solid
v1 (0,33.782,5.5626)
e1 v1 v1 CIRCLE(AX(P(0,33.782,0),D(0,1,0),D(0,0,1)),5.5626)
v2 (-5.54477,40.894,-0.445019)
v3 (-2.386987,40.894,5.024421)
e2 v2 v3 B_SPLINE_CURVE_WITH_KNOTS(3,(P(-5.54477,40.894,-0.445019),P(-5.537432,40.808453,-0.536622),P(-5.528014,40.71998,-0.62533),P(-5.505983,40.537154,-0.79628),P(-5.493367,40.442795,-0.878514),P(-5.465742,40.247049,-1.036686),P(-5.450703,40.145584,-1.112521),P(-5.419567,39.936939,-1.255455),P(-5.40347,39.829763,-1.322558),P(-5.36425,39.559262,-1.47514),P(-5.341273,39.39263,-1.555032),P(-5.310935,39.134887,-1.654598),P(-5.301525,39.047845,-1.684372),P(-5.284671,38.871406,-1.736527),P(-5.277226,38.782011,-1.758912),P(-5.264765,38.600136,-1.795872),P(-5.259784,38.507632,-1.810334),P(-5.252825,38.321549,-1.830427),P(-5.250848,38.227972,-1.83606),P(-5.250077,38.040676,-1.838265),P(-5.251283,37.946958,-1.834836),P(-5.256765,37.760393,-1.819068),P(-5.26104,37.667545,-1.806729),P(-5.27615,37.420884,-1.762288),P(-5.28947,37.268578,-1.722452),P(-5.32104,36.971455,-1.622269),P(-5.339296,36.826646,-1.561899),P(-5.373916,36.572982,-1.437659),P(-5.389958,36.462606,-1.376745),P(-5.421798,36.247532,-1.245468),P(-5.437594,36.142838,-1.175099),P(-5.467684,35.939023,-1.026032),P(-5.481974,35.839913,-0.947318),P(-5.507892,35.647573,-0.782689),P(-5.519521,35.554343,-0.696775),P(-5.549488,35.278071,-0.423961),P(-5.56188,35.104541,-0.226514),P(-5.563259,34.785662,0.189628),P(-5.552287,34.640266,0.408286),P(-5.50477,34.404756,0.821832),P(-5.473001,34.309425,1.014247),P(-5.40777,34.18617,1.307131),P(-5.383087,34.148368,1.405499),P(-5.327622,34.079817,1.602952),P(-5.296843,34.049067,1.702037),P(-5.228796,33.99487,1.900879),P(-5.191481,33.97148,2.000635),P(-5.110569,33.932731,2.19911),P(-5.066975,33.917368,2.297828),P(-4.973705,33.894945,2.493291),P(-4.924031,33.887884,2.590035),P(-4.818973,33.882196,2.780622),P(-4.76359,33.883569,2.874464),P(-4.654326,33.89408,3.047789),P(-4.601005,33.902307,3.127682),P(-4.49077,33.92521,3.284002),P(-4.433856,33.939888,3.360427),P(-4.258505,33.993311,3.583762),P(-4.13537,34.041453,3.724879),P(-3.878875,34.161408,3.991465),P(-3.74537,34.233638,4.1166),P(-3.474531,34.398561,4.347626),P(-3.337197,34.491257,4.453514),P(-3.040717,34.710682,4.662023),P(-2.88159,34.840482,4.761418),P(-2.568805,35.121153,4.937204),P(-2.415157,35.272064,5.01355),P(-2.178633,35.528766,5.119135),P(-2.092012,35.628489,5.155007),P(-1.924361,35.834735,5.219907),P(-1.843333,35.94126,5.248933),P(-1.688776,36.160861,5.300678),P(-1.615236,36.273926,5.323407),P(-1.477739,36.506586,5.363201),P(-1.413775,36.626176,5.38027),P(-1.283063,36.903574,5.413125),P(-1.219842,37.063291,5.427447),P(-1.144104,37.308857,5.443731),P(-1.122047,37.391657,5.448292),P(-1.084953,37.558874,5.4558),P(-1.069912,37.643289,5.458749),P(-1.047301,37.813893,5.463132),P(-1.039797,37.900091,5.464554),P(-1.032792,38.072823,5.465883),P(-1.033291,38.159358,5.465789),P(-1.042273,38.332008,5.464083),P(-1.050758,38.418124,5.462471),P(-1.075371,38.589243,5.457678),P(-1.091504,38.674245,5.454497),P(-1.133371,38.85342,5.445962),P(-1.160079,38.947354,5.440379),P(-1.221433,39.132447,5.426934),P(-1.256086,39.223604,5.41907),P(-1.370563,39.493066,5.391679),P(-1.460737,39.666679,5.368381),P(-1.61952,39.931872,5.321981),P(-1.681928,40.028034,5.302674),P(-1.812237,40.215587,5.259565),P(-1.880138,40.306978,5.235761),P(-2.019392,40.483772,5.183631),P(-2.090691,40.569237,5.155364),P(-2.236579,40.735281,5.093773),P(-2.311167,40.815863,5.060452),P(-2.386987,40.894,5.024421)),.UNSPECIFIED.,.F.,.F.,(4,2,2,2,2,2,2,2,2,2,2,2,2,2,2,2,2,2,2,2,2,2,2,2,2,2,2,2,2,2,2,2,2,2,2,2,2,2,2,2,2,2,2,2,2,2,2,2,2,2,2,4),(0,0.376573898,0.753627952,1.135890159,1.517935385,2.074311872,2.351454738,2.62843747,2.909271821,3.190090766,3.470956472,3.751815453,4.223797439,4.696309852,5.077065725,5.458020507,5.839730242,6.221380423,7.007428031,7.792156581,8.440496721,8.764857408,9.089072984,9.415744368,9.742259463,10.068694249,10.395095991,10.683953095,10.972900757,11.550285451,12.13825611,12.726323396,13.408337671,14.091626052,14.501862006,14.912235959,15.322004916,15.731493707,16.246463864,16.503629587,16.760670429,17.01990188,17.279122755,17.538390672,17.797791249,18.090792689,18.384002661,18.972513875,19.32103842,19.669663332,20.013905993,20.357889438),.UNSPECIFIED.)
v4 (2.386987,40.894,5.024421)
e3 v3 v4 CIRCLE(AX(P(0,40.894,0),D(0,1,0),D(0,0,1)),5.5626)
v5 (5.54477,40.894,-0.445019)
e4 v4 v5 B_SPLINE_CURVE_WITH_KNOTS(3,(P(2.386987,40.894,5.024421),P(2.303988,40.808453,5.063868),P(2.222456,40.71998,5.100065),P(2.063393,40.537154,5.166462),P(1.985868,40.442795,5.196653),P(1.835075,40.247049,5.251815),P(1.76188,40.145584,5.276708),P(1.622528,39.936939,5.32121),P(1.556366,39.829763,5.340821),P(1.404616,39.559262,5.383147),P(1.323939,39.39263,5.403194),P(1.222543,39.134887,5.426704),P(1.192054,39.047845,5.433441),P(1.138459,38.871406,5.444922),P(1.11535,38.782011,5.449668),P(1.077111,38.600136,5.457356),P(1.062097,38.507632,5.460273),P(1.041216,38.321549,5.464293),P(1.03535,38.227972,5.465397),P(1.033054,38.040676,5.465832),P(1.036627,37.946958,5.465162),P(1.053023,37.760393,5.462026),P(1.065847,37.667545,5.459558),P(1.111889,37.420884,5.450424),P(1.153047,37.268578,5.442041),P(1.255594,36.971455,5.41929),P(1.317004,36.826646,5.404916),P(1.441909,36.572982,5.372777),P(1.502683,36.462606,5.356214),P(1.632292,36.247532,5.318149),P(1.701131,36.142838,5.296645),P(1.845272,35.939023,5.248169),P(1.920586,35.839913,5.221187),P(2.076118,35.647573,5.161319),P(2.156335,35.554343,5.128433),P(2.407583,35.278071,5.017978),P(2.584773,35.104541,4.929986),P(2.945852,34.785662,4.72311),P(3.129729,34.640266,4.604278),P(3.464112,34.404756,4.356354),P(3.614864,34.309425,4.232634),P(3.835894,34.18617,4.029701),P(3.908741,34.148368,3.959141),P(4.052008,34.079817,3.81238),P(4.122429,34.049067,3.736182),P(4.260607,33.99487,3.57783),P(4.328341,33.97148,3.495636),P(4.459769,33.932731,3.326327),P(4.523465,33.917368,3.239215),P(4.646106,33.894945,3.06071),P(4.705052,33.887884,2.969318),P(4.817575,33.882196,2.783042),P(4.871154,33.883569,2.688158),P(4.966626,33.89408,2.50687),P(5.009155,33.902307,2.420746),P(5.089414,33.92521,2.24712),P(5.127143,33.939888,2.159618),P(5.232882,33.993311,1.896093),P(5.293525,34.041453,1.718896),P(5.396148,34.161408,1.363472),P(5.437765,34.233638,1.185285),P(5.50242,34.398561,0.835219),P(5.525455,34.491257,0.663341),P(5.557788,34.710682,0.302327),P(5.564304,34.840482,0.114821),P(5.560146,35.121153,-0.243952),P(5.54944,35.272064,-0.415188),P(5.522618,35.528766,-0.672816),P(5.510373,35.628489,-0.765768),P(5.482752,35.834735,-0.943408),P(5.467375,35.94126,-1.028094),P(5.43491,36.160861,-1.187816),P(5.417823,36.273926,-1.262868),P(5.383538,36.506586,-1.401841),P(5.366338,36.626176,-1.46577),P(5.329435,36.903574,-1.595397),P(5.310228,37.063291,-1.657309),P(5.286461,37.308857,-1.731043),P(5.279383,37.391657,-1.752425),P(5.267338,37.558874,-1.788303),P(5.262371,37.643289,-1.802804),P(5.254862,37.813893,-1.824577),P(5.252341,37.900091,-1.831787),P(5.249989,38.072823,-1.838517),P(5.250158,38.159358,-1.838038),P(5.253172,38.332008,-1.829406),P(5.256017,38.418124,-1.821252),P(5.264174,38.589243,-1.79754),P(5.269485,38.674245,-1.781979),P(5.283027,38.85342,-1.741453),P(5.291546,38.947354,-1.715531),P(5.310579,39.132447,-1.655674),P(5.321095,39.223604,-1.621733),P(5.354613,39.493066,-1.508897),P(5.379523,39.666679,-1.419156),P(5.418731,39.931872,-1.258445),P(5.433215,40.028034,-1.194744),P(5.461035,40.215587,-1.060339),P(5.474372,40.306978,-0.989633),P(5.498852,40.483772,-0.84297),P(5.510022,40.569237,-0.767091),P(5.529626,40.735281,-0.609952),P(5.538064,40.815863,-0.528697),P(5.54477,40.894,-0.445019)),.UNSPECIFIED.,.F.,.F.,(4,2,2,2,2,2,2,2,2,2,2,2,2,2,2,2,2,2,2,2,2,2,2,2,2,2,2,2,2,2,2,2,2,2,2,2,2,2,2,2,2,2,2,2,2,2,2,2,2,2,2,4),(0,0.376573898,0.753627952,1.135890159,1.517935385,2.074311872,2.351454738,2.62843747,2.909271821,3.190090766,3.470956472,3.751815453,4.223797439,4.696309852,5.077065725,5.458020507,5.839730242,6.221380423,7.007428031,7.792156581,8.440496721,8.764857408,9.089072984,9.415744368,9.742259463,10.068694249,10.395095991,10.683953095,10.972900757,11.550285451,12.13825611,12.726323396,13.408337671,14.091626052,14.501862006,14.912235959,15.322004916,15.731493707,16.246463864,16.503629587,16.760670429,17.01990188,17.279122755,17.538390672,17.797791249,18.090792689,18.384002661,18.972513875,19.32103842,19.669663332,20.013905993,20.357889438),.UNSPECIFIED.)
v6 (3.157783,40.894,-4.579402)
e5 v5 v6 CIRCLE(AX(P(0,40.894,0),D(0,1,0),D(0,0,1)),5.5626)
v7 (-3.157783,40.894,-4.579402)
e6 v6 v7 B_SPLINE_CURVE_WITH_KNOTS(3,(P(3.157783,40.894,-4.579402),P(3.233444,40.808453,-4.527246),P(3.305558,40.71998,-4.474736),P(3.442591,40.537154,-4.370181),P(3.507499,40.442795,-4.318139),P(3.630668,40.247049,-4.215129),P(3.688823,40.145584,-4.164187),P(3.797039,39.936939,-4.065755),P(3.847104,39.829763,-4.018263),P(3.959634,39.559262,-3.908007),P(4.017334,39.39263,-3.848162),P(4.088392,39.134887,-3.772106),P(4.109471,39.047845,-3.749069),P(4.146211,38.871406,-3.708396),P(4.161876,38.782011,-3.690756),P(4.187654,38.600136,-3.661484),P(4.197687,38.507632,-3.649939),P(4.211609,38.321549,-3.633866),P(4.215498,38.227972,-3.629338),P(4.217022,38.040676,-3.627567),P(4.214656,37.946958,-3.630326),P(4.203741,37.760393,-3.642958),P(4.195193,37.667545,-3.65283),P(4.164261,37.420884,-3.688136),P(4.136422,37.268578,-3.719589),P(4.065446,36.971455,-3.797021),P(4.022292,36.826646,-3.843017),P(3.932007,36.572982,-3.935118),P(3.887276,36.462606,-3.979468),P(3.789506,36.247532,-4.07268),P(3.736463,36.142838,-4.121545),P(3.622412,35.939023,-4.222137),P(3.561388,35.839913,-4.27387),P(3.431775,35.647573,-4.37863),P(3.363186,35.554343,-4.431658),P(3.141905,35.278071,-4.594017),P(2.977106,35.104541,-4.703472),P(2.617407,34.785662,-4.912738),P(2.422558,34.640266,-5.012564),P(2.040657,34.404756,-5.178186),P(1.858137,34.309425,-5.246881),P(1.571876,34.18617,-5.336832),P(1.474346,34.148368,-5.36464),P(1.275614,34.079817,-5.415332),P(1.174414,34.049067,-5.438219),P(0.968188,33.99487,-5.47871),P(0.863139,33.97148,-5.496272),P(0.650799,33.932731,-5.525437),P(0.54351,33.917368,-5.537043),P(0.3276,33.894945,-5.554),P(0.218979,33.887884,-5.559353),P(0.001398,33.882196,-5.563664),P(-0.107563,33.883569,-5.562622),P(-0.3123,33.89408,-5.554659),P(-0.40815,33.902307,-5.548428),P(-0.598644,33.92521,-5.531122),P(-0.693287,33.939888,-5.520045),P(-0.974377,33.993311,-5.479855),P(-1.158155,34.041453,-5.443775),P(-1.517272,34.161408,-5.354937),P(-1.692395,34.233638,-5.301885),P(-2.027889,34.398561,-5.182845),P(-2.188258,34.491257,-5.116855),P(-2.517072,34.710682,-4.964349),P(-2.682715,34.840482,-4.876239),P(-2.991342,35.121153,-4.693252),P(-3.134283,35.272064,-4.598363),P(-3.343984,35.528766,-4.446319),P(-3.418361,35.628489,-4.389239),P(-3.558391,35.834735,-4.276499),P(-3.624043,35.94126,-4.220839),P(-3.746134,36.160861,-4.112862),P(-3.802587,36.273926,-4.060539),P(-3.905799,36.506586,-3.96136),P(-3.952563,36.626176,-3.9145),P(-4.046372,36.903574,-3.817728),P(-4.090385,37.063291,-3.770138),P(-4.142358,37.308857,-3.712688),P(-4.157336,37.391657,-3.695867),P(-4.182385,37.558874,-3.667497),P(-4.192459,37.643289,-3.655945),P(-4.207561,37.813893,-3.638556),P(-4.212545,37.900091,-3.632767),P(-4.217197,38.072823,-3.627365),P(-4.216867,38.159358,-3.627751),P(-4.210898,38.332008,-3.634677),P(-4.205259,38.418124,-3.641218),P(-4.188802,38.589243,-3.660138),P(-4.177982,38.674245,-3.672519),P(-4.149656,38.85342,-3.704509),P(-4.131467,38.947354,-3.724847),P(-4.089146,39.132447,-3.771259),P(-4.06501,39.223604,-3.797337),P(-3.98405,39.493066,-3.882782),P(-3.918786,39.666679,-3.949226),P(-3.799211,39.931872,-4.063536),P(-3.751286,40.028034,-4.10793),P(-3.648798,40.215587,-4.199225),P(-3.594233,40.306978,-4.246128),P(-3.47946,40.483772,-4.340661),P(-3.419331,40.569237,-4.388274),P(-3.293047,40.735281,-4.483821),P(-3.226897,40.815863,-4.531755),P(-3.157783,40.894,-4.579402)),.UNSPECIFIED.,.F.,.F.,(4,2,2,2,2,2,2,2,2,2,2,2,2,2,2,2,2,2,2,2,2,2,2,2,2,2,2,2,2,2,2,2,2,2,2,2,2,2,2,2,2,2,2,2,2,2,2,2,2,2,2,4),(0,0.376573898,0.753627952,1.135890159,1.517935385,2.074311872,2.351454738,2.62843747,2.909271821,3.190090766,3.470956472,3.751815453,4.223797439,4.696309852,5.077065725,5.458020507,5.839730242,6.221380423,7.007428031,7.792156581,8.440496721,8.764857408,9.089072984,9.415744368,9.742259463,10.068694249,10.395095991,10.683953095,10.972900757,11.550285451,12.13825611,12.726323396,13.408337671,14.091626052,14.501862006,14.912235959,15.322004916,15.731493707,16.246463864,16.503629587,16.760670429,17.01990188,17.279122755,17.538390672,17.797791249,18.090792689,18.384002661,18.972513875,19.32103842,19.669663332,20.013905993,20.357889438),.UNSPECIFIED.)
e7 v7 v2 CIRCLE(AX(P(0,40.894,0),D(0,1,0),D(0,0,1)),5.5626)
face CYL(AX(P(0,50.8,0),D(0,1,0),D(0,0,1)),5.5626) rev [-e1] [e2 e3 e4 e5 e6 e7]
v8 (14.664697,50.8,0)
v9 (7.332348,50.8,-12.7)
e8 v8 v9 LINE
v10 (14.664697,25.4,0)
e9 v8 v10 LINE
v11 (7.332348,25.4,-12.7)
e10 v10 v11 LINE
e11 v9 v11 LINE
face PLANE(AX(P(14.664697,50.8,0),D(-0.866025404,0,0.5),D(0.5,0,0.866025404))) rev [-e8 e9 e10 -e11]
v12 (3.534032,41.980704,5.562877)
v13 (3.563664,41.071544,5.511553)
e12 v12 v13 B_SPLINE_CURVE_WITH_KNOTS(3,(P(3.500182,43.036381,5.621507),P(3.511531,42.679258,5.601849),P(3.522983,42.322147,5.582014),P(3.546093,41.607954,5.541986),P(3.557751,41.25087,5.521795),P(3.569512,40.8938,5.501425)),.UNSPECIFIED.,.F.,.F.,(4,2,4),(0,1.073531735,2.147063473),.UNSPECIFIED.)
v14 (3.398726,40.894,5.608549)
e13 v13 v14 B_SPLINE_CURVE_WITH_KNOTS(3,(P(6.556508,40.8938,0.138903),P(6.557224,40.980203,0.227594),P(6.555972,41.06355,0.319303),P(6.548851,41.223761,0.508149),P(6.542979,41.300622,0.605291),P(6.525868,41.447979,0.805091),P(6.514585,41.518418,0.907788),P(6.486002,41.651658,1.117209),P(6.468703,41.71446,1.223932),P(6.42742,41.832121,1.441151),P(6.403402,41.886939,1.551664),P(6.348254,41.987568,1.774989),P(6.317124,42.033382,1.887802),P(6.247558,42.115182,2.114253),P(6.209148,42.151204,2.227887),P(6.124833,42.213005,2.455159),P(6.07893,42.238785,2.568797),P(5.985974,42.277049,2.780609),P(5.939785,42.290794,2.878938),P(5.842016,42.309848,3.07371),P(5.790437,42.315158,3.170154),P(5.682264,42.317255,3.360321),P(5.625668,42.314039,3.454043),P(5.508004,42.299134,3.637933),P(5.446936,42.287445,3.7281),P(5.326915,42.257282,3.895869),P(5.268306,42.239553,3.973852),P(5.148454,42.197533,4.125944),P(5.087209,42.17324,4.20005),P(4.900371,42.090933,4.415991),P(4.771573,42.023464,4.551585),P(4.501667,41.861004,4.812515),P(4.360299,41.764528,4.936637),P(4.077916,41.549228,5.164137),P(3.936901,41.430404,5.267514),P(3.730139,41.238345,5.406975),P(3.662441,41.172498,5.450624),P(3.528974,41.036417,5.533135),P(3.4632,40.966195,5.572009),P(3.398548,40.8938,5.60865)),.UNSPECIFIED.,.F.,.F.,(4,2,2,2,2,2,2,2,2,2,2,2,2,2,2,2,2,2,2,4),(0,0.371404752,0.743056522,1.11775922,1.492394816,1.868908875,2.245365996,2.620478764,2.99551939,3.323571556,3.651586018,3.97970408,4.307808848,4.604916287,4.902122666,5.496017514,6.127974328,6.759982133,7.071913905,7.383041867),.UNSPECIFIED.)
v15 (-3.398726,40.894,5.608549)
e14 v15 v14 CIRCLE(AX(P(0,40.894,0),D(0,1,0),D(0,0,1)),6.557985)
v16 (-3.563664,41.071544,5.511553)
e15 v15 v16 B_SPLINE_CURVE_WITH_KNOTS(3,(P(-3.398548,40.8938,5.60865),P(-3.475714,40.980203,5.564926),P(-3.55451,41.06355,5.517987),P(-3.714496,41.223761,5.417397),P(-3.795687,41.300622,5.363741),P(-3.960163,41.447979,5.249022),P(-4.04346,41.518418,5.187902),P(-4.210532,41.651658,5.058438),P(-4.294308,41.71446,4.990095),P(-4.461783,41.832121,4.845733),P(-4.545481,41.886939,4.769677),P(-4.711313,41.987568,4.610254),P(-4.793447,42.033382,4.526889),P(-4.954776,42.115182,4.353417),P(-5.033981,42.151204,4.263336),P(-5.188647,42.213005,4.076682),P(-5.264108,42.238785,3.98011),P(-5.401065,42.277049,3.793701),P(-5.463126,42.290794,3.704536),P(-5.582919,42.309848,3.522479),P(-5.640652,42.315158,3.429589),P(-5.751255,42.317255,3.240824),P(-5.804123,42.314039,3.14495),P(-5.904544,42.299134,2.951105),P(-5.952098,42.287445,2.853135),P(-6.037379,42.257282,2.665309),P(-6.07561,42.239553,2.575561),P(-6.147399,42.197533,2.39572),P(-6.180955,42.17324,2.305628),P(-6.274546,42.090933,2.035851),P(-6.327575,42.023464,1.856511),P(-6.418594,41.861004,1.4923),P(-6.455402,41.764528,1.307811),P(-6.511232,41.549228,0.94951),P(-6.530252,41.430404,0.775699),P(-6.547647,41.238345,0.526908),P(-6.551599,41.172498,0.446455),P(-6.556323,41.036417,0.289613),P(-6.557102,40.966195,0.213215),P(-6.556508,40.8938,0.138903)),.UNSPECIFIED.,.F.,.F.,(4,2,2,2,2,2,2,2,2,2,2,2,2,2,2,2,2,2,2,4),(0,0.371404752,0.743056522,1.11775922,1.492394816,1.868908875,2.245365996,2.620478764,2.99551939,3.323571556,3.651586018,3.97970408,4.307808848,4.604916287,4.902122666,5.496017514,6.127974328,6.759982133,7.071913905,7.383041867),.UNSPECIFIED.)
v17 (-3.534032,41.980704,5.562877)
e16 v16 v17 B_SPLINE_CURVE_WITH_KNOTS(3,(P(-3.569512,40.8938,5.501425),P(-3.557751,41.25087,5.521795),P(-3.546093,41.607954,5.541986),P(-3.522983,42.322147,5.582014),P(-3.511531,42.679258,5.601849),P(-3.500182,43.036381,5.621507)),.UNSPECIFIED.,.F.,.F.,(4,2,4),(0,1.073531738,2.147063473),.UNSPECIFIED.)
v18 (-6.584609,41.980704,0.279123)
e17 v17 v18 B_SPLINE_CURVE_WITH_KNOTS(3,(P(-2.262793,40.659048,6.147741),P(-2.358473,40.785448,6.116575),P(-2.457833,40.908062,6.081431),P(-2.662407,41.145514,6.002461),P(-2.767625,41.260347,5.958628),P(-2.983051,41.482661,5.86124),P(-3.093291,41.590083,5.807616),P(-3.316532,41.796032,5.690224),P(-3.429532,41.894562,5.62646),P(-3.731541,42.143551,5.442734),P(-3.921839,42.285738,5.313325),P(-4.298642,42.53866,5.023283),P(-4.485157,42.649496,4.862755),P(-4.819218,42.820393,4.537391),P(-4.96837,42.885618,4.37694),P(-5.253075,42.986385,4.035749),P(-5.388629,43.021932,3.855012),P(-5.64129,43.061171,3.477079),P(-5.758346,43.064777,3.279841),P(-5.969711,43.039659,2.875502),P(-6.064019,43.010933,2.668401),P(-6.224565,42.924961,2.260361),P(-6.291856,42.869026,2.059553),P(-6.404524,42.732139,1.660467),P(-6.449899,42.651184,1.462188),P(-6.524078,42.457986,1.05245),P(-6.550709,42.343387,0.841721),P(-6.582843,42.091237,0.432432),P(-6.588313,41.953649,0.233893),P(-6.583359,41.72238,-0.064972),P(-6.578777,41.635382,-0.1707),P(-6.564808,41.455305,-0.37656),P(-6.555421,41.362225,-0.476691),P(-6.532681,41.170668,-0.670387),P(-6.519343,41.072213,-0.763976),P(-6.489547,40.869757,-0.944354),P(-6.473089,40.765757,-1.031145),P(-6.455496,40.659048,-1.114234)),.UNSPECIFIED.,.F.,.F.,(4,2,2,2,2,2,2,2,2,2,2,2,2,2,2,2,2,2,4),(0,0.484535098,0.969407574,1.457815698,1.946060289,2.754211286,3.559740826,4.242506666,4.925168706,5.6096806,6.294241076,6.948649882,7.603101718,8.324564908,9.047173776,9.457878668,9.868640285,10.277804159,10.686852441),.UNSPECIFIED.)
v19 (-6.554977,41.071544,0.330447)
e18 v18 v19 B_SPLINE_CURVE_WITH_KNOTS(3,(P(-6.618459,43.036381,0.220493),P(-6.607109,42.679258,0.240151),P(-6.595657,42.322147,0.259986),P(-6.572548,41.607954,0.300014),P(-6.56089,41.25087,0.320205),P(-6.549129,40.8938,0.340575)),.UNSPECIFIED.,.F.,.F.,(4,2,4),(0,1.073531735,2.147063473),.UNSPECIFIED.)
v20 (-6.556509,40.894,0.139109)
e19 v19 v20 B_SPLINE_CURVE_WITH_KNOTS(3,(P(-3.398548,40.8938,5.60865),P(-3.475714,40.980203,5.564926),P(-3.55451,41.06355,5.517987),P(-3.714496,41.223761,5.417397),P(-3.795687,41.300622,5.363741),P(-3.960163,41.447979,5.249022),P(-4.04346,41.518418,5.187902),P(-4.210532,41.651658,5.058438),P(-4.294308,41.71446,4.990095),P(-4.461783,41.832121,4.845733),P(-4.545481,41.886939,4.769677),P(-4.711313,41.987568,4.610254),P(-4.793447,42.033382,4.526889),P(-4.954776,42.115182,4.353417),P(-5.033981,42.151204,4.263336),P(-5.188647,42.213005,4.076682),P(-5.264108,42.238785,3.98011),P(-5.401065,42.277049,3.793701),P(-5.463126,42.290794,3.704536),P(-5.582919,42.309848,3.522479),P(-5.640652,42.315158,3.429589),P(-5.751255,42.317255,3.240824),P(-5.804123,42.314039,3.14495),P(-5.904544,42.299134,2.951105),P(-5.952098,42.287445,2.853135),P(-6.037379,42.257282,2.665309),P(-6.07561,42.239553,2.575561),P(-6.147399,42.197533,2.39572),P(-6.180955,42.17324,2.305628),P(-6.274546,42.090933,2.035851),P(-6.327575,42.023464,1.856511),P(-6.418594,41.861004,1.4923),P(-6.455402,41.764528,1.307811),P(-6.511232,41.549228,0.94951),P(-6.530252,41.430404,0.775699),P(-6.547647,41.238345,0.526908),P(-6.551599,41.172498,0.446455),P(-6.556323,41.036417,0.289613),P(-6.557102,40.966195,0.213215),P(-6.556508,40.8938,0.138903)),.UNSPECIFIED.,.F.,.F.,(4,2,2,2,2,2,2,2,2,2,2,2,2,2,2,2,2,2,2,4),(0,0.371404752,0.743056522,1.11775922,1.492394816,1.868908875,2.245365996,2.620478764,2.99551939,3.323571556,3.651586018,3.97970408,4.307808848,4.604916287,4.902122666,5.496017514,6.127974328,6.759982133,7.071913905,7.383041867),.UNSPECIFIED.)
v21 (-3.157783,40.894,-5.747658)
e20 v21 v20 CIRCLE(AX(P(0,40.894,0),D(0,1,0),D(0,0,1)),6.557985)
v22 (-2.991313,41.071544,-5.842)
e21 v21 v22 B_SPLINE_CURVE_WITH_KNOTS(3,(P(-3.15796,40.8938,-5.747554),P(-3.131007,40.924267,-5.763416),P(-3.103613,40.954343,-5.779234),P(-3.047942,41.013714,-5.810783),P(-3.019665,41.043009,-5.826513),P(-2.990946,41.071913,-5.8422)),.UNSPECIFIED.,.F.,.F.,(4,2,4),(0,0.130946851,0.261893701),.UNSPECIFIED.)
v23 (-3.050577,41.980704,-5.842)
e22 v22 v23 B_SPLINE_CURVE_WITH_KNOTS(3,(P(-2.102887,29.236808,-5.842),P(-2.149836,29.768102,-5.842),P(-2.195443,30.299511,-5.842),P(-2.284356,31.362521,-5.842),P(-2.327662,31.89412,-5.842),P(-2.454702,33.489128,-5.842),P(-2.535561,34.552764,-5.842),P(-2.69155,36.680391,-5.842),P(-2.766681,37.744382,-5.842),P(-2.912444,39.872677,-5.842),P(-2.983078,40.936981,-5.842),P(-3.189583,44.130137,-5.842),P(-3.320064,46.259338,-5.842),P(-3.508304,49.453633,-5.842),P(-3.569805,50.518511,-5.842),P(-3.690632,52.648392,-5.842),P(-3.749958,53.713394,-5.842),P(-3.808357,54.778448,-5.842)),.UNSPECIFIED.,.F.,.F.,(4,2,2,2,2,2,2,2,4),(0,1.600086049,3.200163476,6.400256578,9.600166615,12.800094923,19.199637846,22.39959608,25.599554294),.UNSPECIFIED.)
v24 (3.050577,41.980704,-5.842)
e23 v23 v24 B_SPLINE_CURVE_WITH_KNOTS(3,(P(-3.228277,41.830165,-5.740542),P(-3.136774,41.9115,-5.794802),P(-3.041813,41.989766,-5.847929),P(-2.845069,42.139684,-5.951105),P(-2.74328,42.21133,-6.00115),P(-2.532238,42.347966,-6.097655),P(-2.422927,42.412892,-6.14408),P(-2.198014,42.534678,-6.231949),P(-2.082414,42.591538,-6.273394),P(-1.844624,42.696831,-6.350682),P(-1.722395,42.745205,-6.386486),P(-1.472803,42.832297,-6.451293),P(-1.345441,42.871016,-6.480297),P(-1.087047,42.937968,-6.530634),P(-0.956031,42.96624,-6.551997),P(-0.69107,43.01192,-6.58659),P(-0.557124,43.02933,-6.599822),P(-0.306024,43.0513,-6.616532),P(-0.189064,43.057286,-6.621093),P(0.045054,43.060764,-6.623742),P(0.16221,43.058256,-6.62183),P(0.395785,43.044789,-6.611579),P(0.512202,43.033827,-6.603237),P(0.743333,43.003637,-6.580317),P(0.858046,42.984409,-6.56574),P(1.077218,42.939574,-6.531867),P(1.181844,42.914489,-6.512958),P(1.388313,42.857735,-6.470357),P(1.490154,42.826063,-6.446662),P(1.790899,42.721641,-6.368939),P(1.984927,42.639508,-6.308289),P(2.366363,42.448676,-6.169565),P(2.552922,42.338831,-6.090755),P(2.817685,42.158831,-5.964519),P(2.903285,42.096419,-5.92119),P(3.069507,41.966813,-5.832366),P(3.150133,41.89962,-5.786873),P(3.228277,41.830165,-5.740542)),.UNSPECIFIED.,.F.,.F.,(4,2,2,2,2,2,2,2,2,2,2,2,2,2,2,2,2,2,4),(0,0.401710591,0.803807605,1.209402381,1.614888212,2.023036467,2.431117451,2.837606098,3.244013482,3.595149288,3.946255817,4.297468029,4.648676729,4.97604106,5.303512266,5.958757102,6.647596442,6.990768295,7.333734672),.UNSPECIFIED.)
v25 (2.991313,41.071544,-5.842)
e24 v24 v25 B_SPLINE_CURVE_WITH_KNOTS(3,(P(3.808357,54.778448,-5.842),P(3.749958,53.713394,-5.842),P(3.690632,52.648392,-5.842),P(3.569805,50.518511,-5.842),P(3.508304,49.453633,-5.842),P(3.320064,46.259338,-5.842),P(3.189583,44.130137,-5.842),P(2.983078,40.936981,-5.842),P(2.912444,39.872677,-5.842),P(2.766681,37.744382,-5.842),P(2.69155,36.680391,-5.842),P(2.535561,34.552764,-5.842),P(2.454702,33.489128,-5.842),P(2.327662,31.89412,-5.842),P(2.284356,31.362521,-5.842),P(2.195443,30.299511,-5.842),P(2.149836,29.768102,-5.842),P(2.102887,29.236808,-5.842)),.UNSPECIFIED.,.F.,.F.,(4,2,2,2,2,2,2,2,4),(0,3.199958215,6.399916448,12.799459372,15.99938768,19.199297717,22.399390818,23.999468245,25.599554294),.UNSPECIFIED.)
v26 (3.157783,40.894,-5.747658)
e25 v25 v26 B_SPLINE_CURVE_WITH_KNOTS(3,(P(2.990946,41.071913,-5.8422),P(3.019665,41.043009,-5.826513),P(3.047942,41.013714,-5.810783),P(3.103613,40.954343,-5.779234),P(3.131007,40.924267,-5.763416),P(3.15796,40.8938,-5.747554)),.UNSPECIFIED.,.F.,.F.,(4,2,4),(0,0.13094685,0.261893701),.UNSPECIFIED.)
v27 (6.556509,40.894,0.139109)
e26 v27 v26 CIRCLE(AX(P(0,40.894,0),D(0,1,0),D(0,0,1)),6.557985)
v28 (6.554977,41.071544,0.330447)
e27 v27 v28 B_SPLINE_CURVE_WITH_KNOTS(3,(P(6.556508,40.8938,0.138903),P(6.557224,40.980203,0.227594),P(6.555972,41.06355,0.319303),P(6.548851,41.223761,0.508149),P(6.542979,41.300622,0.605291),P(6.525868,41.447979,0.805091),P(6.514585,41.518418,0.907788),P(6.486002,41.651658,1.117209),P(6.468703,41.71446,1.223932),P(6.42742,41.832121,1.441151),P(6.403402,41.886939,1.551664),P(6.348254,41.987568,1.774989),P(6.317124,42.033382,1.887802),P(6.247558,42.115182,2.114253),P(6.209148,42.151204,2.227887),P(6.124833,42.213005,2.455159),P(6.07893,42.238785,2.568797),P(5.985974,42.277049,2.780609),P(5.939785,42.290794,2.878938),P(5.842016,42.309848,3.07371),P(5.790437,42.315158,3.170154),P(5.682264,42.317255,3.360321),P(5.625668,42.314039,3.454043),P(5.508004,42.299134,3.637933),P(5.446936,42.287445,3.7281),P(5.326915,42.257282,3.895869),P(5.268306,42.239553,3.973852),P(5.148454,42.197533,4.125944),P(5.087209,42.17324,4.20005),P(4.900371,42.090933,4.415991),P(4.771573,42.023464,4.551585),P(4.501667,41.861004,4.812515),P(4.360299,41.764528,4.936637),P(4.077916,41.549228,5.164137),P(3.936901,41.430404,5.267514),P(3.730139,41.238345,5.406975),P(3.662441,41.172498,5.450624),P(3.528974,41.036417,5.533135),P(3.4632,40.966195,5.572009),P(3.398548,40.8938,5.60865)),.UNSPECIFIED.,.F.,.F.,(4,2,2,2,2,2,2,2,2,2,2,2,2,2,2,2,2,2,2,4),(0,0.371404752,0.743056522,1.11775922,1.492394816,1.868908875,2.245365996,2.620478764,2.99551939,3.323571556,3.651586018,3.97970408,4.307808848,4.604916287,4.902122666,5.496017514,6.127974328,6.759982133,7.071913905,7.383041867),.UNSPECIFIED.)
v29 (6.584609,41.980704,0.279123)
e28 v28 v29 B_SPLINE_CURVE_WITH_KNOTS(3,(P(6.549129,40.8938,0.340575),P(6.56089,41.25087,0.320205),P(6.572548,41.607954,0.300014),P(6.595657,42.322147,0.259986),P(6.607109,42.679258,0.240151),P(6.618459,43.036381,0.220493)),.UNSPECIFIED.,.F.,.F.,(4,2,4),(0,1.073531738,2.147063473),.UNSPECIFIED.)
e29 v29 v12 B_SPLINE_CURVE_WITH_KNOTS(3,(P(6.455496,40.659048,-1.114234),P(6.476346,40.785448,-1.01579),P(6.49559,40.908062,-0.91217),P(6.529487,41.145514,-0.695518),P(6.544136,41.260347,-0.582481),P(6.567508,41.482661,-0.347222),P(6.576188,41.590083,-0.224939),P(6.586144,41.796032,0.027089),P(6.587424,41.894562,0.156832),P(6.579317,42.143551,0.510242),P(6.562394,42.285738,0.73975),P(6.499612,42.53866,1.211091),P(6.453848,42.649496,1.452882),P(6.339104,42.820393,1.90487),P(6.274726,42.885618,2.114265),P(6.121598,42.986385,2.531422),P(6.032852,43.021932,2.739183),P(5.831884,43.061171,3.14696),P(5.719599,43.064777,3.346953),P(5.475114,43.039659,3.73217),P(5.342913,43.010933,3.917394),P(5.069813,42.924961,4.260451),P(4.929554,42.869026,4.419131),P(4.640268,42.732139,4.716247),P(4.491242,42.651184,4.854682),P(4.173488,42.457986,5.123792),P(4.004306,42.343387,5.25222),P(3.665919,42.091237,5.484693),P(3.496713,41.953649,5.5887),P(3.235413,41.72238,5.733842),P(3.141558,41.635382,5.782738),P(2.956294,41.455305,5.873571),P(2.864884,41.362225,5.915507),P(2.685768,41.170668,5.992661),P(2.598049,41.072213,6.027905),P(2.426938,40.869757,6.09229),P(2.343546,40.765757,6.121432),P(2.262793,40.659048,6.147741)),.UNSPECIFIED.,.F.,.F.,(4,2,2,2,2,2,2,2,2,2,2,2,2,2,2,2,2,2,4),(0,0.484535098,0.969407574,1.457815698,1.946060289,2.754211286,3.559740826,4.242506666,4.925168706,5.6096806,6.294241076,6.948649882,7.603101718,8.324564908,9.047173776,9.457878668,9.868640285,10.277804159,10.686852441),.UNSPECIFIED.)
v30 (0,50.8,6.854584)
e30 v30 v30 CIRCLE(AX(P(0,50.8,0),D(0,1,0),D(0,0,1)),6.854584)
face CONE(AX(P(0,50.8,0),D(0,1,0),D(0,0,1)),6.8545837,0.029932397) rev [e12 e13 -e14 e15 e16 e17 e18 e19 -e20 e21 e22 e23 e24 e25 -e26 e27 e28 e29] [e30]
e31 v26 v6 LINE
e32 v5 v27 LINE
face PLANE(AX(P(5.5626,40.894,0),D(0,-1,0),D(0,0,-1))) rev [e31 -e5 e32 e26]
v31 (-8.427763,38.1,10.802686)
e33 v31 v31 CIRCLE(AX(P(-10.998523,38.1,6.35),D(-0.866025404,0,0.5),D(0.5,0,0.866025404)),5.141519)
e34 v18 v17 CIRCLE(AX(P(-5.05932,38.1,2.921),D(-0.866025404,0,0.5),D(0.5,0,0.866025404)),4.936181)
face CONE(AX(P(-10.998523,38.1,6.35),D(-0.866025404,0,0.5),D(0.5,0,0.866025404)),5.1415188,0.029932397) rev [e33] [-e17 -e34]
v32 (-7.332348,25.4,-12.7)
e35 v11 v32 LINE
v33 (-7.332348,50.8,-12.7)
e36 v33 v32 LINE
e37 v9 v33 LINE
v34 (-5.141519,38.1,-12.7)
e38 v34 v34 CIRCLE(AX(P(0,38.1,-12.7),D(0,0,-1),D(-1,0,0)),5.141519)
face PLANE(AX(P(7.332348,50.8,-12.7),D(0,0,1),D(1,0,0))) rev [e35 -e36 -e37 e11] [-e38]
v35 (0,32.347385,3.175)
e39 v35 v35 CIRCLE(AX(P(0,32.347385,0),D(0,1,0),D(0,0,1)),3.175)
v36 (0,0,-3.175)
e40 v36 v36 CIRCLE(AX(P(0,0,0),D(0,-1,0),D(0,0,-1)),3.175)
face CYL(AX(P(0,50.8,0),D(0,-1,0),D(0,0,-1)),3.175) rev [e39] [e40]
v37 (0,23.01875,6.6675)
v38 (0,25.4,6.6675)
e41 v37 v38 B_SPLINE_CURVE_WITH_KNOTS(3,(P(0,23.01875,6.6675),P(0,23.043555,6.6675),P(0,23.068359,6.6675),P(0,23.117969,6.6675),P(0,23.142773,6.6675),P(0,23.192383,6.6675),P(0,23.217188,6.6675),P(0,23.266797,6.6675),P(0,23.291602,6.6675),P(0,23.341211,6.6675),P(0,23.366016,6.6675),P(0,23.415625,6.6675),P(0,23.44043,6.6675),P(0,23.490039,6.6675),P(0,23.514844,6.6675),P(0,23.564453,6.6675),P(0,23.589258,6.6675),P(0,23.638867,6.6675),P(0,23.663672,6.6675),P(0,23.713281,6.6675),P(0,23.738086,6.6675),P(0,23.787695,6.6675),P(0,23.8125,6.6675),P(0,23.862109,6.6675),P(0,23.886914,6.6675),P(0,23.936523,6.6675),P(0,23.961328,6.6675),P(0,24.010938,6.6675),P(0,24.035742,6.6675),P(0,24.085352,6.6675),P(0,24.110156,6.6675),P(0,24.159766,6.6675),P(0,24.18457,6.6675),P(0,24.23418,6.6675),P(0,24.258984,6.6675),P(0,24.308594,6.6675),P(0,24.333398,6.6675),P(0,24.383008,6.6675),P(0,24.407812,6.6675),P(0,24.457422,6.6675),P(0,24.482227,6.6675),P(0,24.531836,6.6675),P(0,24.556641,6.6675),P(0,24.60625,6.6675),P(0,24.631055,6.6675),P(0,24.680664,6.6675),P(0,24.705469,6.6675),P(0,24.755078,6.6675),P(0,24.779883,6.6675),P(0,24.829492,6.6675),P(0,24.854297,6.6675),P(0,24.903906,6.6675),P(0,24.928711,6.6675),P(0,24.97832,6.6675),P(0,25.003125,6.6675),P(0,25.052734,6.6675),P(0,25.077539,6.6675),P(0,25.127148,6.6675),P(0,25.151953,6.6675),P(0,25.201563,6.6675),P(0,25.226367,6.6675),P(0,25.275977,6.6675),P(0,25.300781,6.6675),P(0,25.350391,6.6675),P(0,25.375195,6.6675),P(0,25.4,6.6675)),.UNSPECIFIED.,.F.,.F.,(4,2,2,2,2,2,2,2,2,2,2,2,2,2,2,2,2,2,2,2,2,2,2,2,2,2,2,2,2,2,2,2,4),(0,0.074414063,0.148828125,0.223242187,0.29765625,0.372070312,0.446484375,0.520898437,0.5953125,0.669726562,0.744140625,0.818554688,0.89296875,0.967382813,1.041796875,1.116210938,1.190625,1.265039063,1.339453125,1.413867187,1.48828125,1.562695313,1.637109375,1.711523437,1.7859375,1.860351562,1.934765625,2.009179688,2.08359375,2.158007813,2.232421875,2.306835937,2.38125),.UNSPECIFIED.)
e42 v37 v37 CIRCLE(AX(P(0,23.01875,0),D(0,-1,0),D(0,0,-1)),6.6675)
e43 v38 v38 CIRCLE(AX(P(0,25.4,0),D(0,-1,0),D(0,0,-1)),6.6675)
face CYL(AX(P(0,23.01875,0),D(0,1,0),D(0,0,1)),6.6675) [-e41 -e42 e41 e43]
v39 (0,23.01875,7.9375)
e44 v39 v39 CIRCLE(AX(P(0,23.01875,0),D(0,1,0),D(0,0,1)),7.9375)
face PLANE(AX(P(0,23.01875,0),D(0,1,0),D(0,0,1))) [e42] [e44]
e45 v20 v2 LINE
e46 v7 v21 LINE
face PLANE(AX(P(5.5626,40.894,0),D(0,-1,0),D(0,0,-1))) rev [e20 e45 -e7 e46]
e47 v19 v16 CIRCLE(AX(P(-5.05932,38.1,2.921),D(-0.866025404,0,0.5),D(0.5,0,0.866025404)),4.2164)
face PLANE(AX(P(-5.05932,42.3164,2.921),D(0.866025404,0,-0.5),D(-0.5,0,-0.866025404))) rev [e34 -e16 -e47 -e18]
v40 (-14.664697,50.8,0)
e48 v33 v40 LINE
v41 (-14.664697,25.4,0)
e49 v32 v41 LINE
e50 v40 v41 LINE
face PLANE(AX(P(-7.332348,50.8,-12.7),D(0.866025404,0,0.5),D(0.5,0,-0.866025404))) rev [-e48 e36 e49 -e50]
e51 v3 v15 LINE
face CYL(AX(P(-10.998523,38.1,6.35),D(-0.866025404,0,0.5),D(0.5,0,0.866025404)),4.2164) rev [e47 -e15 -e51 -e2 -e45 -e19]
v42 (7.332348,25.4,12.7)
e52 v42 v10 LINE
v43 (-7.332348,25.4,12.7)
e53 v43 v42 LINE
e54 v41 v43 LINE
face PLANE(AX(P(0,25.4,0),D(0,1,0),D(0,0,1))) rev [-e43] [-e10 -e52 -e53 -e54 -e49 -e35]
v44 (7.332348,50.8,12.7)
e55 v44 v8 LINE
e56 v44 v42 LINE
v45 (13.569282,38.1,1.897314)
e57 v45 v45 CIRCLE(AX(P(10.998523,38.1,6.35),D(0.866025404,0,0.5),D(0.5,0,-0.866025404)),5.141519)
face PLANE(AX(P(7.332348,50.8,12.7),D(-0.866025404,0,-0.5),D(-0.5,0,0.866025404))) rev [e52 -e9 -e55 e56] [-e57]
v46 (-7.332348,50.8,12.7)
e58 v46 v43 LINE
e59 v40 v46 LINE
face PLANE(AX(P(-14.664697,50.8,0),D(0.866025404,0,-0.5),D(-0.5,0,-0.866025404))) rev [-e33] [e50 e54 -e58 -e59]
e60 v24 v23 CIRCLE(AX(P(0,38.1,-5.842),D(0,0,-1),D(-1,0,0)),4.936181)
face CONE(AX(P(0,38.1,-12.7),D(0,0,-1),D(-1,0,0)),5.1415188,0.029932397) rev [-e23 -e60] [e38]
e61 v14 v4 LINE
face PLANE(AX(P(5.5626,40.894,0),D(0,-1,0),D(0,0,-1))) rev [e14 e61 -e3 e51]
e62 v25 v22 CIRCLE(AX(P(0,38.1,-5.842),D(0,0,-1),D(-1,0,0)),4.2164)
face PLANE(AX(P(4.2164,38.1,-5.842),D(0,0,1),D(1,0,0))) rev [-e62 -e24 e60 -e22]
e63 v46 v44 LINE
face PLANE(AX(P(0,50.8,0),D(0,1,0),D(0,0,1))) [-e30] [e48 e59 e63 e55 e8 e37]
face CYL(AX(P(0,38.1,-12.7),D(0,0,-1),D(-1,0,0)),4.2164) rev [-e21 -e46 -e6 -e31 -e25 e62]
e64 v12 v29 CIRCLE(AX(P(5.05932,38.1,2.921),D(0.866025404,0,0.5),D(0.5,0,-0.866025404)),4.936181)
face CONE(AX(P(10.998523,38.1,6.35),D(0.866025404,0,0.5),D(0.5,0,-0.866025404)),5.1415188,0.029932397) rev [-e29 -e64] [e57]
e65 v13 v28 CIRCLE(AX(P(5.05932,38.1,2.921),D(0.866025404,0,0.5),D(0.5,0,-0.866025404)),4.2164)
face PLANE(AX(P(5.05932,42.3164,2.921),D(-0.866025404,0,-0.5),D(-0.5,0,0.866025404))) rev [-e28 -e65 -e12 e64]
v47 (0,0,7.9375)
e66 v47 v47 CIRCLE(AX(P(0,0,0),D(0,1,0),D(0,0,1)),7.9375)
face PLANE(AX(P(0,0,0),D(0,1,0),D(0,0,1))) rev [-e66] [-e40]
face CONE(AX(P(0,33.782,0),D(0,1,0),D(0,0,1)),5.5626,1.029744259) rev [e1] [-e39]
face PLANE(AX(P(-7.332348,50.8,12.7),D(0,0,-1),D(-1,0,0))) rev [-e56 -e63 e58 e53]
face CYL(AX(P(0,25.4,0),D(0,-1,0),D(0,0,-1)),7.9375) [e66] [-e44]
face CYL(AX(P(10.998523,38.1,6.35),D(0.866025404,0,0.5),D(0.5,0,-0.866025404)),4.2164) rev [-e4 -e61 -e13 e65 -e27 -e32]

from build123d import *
from OCP.BRepAlgoAPI import BRepAlgoAPI_Cut
from OCP.TopTools import TopTools_ListOfShape

# Parameters (mm, degrees)
SKETCH1_R           = 7.9375
BOSS_EXTRUDE1_DEPTH = 25.4
BOSS_EXTRUDE2_DEPTH = 25.4
SKETCH3_R           = 3.175
CUT_EXTRUDE1_DEPTH  = 55.37815125
SKETCH6_R           = 6.6675
CUT_EXTRUDE2_DEPTH  = 2.38125


with BuildPart() as part:
    # Sketch1 → Boss-Extrude1 (new body)
    with BuildSketch(Plane(origin=(0, 0, 0), x_dir=(1, 0, 0), z_dir=(0, 1, 0))):
        Circle(SKETCH1_R)
    extrude(amount=BOSS_EXTRUDE1_DEPTH)

    # Sketch2 → Boss-Extrude2 (add)
    with BuildSketch(Plane(origin=(0, 25.4, 0), x_dir=(1, 0, 0), z_dir=(0, 1, 0))):
        Polygon((14.664696837, 0), (7.332348419, 12.7), (-7.332348419, 12.7), (-14.664696837, 0), (-7.332348419, -12.7), (7.332348419, -12.7), align=None)
    extrude(amount=BOSS_EXTRUDE2_DEPTH)

    # Sketch3 → Cut-Extrude1 (cut, through all)
    with BuildSketch(Plane.XZ):
        Circle(SKETCH3_R)
    extrude(amount=-CUT_EXTRUDE1_DEPTH, mode=Mode.SUBTRACT)

    # Sketch6 → Cut-Extrude2 (cut)
    with BuildSketch(Plane.XZ.offset(-25.4)):
        Polygon((-14.664696837, 0), (-7.332348419, 12.7), (7.332348419, 12.7), (14.664696837, 0), (7.332348419, -12.7), (-7.332348419, -12.7), align=None)
        Circle(SKETCH6_R, mode=Mode.SUBTRACT)
    extrude(amount=CUT_EXTRUDE2_DEPTH, mode=Mode.SUBTRACT)

    # Sketch4 → 1/4 NPT Tapped Hole1 (revolve, cut)
    with BuildSketch(Plane(origin=(0, 50.8, 0), x_dir=(0, 0, 1), z_dir=(1, 0, 0))):
        Polygon((0, 0), (0, 20.360347279), (5.5626, 17.018), (5.5626, 9.906), (6.557984794, 9.906), (6.8545837, 0), align=None)
    revolve(axis=Axis((0, 57.15, 0), (0, -1, 0)), mode=Mode.SUBTRACT)


with BuildPart() as f_1_8_npt_tapped_hole1_tool:
    # Sketch9 → 1/8 NPT Tapped Hole1 (revolve)
    with BuildSketch(Plane(origin=(10.998522628, 38.1, 6.35), x_dir=(0.4999999999999991, 0, -0.8660254037844392), z_dir=(0, 1, 0))):
        Polygon((0, 0), (0, 14.217468714), (4.2164, 11.684), (4.2164, 6.858), (4.936181096, 6.858), (5.1415188, 0), align=None)
    revolve(axis=Axis((16.497783942, 38.1, 9.525), (-0.8660254037844392, 0, -0.4999999999999991)))


with BuildPart() as part_1:
    add(part.part)

    # 1/8 NPT Tapped Hole1: cut by f_1_8_npt_tapped_hole1_tool, with a tolerance
    f_1_8_npt_tapped_hole1_stock = TopTools_ListOfShape()
    f_1_8_npt_tapped_hole1_stock.Append(part_1.part.wrapped)
    f_1_8_npt_tapped_hole1_tools = TopTools_ListOfShape()
    f_1_8_npt_tapped_hole1_tools.Append(f_1_8_npt_tapped_hole1_tool.part.wrapped)
    f_1_8_npt_tapped_hole1_cut = BRepAlgoAPI_Cut()
    f_1_8_npt_tapped_hole1_cut.SetArguments(f_1_8_npt_tapped_hole1_stock)
    f_1_8_npt_tapped_hole1_cut.SetTools(f_1_8_npt_tapped_hole1_tools)
    f_1_8_npt_tapped_hole1_cut.SetFuzzyValue(0.00001)
    f_1_8_npt_tapped_hole1_cut.Build()
    add(Compound.cast(f_1_8_npt_tapped_hole1_cut.Shape()).solids(), mode=Mode.REPLACE)


with BuildPart() as f_1_8_npt_tapped_hole1_at_2_tool:
    # Sketch9 at point 2 (carried to point 2, square into its face) → 1/8 NPT Tapped Hole1 at 2 (revolve)
    with BuildSketch(Plane(origin=(0, 38.1, -12.7), x_dir=(-1, 0, 0), z_dir=(0, 1, 0))):
        Polygon((0, 0), (0, 14.217468714), (4.2164, 11.684), (4.2164, 6.858), (4.936181096, 6.858), (5.1415188, 0), align=None)
    revolve(axis=Axis((0, 38.1, -19.05), (0, 0, 1)))


with BuildPart() as part_2:
    add(part_1.part)

    # 1/8 NPT Tapped Hole1 at 2: cut by f_1_8_npt_tapped_hole1_at_2_tool, with a tolerance
    f_1_8_npt_tapped_hole1_at_2_stock = TopTools_ListOfShape()
    f_1_8_npt_tapped_hole1_at_2_stock.Append(part_2.part.wrapped)
    f_1_8_npt_tapped_hole1_at_2_tools = TopTools_ListOfShape()
    f_1_8_npt_tapped_hole1_at_2_tools.Append(f_1_8_npt_tapped_hole1_at_2_tool.part.wrapped)
    f_1_8_npt_tapped_hole1_at_2_cut = BRepAlgoAPI_Cut()
    f_1_8_npt_tapped_hole1_at_2_cut.SetArguments(f_1_8_npt_tapped_hole1_at_2_stock)
    f_1_8_npt_tapped_hole1_at_2_cut.SetTools(f_1_8_npt_tapped_hole1_at_2_tools)
    f_1_8_npt_tapped_hole1_at_2_cut.SetFuzzyValue(0.00001)
    f_1_8_npt_tapped_hole1_at_2_cut.Build()
    add(Compound.cast(f_1_8_npt_tapped_hole1_at_2_cut.Shape()).solids(), mode=Mode.REPLACE)


with BuildPart() as f_1_8_npt_tapped_hole1_at_3_tool:
    # Sketch9 at point 3 (carried to point 3, square into its face) → 1/8 NPT Tapped Hole1 at 3 (revolve)
    with BuildSketch(Plane(origin=(-10.998522628, 38.1, 6.35), x_dir=(0.500000175, 0, 0.866025303), z_dir=(0, 1, 0))):
        Polygon((0, 0), (0, 14.217468714), (4.2164, 11.684), (4.2164, 6.858), (4.936181096, 6.858), (5.1415188, 0), align=None)
    revolve(axis=Axis((-16.497783301, 38.1, 9.52500111), (0.866025303, 0, -0.500000175)))


with BuildPart() as part_3:
    add(part_2.part)

    # 1/8 NPT Tapped Hole1 at 3: cut by f_1_8_npt_tapped_hole1_at_3_tool, with a tolerance
    f_1_8_npt_tapped_hole1_at_3_stock = TopTools_ListOfShape()
    f_1_8_npt_tapped_hole1_at_3_stock.Append(part_3.part.wrapped)
    f_1_8_npt_tapped_hole1_at_3_tools = TopTools_ListOfShape()
    f_1_8_npt_tapped_hole1_at_3_tools.Append(f_1_8_npt_tapped_hole1_at_3_tool.part.wrapped)
    f_1_8_npt_tapped_hole1_at_3_cut = BRepAlgoAPI_Cut()
    f_1_8_npt_tapped_hole1_at_3_cut.SetArguments(f_1_8_npt_tapped_hole1_at_3_stock)
    f_1_8_npt_tapped_hole1_at_3_cut.SetTools(f_1_8_npt_tapped_hole1_at_3_tools)
    f_1_8_npt_tapped_hole1_at_3_cut.SetFuzzyValue(0.00001)
    f_1_8_npt_tapped_hole1_at_3_cut.Build()
    add(Compound.cast(f_1_8_npt_tapped_hole1_at_3_cut.Shape()).solids(), mode=Mode.REPLACE)


solid = part_3.part
